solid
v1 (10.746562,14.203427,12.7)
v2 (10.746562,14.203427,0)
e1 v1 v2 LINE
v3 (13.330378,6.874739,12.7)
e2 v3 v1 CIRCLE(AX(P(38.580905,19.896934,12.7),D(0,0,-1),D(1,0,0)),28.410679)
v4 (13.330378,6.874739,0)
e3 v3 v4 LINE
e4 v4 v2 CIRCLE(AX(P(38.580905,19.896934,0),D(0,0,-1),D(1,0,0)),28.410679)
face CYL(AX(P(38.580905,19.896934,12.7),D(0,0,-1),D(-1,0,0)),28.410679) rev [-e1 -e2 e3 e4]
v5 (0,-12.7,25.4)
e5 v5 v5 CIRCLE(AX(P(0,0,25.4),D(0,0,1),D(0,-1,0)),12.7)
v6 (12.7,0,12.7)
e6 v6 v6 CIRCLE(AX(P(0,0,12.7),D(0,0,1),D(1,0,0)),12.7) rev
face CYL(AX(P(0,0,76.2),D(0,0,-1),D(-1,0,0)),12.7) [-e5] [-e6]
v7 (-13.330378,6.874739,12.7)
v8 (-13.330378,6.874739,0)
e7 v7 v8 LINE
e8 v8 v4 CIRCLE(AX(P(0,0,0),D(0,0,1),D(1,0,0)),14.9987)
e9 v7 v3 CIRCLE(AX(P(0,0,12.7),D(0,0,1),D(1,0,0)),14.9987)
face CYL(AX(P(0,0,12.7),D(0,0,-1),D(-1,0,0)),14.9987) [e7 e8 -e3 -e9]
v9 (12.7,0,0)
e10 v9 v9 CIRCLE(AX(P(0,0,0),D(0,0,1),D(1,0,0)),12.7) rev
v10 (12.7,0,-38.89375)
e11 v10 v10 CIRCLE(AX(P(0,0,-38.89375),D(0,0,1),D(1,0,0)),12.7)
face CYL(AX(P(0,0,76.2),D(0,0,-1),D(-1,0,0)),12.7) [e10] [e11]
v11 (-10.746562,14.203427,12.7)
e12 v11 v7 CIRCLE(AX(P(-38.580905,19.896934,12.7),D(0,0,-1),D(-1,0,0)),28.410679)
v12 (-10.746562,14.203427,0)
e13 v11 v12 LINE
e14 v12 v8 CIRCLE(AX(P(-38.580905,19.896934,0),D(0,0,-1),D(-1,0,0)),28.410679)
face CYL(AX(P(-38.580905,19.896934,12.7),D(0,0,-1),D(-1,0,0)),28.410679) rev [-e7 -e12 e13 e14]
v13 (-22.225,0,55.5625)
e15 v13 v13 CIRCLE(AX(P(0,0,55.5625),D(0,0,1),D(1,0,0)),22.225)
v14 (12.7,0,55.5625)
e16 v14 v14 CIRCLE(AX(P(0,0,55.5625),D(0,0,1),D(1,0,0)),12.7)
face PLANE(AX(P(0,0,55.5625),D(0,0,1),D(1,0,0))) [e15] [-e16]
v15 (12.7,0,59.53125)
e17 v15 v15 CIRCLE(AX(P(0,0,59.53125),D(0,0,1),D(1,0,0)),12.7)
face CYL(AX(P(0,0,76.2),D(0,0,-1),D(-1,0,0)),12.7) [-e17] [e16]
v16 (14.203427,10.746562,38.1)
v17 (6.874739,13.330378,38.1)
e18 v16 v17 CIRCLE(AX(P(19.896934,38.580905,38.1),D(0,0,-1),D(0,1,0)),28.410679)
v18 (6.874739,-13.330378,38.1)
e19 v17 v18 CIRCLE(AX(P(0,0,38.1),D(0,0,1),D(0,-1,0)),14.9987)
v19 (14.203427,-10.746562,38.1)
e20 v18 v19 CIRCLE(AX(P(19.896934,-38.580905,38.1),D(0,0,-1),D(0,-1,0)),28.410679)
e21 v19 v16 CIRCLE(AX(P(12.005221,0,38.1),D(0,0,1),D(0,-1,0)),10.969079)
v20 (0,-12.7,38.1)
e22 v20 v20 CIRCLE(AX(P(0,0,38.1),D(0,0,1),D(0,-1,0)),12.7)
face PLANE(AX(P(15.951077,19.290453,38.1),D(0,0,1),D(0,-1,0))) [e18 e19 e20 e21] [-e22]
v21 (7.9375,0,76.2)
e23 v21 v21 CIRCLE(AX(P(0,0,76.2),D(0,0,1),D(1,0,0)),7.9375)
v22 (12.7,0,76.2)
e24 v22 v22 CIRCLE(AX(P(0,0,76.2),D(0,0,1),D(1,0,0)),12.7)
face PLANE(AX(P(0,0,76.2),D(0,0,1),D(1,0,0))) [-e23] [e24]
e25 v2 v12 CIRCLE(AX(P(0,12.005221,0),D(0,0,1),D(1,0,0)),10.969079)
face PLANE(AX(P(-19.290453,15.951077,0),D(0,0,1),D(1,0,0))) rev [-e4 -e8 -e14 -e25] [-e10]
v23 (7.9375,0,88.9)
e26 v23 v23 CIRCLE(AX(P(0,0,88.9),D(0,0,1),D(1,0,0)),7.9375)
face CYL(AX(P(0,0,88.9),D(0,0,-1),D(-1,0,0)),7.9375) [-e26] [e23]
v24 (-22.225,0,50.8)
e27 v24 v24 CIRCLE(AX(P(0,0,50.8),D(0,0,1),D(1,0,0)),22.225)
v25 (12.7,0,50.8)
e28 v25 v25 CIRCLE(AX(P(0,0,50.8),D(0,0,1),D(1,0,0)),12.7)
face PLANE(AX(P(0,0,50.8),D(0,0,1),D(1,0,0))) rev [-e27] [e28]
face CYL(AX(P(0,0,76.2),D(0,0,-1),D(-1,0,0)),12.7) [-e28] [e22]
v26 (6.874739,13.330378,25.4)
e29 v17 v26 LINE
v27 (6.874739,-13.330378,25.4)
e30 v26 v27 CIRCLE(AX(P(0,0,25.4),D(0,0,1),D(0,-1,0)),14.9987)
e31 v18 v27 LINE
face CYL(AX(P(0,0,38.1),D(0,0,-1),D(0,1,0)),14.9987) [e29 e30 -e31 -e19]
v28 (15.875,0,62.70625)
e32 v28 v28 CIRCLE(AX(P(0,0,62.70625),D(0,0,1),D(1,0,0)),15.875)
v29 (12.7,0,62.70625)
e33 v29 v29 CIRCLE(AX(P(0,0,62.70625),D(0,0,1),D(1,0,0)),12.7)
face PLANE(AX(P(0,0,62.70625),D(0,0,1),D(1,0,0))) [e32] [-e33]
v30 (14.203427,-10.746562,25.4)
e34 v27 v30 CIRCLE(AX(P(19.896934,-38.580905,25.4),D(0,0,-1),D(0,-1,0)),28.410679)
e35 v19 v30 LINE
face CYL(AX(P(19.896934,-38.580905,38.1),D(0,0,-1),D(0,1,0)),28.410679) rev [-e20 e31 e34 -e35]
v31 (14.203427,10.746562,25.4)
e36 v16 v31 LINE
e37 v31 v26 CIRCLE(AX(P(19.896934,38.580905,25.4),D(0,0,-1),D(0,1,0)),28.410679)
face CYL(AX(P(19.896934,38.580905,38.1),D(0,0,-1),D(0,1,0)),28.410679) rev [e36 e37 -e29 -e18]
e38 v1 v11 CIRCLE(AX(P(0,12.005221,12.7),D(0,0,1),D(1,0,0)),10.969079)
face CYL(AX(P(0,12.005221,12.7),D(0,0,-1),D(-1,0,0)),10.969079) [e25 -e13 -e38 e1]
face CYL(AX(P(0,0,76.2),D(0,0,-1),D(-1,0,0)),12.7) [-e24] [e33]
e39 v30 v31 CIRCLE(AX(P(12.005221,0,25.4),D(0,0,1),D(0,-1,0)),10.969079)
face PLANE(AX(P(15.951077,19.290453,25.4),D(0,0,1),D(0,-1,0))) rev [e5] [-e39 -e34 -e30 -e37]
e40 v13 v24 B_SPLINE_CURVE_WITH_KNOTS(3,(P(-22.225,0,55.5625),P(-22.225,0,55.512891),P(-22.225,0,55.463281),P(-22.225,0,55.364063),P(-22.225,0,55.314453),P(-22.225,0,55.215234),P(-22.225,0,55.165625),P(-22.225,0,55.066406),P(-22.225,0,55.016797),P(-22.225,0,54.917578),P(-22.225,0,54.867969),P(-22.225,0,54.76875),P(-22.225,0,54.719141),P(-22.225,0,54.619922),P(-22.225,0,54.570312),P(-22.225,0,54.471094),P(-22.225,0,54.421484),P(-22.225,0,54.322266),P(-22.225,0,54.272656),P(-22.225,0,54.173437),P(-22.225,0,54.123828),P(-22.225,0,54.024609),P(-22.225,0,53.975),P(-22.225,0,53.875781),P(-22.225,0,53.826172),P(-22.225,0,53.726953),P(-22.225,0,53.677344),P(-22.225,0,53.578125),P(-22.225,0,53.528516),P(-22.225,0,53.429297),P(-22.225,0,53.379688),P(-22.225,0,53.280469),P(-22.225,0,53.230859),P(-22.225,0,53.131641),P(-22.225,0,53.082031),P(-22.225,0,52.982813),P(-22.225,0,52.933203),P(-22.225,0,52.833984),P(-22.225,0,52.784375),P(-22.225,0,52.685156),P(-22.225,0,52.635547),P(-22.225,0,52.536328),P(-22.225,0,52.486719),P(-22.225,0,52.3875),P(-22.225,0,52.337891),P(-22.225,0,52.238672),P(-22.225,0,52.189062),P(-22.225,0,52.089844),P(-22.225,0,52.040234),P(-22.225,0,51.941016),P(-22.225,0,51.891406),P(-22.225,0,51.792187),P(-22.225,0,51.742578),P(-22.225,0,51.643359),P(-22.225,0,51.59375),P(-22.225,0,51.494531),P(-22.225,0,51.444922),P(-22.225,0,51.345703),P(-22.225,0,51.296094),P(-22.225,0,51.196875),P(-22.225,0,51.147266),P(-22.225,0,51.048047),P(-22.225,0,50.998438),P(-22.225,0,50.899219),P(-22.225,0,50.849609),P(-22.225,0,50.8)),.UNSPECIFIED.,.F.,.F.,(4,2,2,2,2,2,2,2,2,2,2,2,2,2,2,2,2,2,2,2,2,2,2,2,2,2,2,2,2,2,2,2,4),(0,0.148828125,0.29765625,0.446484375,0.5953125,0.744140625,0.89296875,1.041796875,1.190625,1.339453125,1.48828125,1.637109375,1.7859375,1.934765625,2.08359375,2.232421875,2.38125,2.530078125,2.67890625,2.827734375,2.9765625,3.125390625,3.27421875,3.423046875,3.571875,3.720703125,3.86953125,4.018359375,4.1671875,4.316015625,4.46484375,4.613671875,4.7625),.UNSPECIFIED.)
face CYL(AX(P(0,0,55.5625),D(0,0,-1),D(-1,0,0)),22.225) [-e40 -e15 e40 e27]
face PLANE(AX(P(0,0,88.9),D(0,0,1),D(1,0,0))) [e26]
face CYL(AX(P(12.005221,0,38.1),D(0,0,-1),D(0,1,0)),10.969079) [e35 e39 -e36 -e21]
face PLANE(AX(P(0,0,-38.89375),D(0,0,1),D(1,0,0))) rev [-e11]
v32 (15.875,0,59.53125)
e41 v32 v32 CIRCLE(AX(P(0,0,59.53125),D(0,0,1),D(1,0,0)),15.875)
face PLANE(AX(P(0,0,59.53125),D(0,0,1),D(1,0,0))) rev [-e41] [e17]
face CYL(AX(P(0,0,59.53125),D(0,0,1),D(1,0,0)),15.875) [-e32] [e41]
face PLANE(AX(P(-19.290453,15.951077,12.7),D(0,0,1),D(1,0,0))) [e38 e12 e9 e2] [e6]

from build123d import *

# Parameters (mm, degrees)
BOSS_EXTRUDE2_DEPTH      = 12.7
BOSS_EXTRUDE3_DEPTH      = 63.5
BOSS_EXTRUDE3_DEPTH_BACK = 51.59375
SKETCH3_R                = 12.7
CRVPATTERN3_START        = 25.4
CRVPATTERN3_OUTLINE_R    = 12.7
CRVPATTERN3_DEPTH        = 12.7
BOSS_EXTRUDE5_START      = -25.4
SKETCH7_R                = 22.225
BOSS_EXTRUDE5_DEPTH      = 4.7625
BOSS_EXTRUDE7_START      = -13.49375
SKETCH10_R               = 15.875
BOSS_EXTRUDE7_DEPTH      = 3.175
SKETCH9_R                = 7.9375
BOSS_EXTRUDE8_DEPTH      = 12.7


# Read off the part's stored shape, not the designer's step: CrvPattern3
with BuildPart() as part:
    # Sketch2 → Boss-Extrude2 (new body)
    with BuildSketch(Plane.XY):
        with BuildLine():
            ThreePointArc((-10.74656161, 14.203426928), (-11.786721082, 10.450325862), (-13.330377698, 6.874738694))
            ThreePointArc((-13.330377698, 6.874738694), (0, -14.9987), (13.330377698, 6.874738694))
            ThreePointArc((13.330377698, 6.874738694), (11.786721082, 10.450325862), (10.74656161, 14.203426928))
            ThreePointArc((10.74656161, 14.203426928), (0, 22.9743), (-10.74656161, 14.203426928))
        make_face()
    extrude(amount=BOSS_EXTRUDE2_DEPTH)

    # Sketch3 → Boss-Extrude3 (add, two sides: drawn at the far end of the back side and taken through both)
    with BuildSketch(Plane.XY.offset(12.7).offset(-BOSS_EXTRUDE3_DEPTH_BACK)):
        Circle(SKETCH3_R)
    extrude(amount=BOSS_EXTRUDE3_DEPTH + BOSS_EXTRUDE3_DEPTH_BACK)

    # CrvPattern3 outline → CrvPattern3 (add)
    with BuildSketch(Plane.XY.offset(CRVPATTERN3_START)):
        with BuildLine():
            ThreePointArc((6.874738694, 13.330377698), (-14.9987, 0), (6.874738694, -13.330377698))
            ThreePointArc((6.874738694, -13.330377698), (10.450325862, -11.786721082), (14.203426928, -10.74656161))
            ThreePointArc((14.203426928, -10.74656161), (22.9743, 0), (14.203426928, 10.74656161))
            ThreePointArc((14.203426928, 10.74656161), (10.450325862, 11.786721082), (6.874738694, 13.330377698))
        make_face()
        Circle(CRVPATTERN3_OUTLINE_R, mode=Mode.SUBTRACT)
    extrude(amount=CRVPATTERN3_DEPTH)

    # Sketch7 → Boss-Extrude5 (add)
    with BuildSketch(Plane.XY.offset(76.2).offset(BOSS_EXTRUDE5_START)):
        with Locations(Location((0, 0, 0), (0, 0, 180))):
            Circle(SKETCH7_R)
    extrude(amount=BOSS_EXTRUDE5_DEPTH)

    # Sketch10 → Boss-Extrude7 (add)
    with BuildSketch(Plane.XY.offset(76.2).offset(BOSS_EXTRUDE7_START)):
        Circle(SKETCH10_R)
    extrude(amount=-BOSS_EXTRUDE7_DEPTH)

    # Sketch9 → Boss-Extrude8 (add)
    with BuildSketch(Plane.XY.offset(76.2)):
        Circle(SKETCH9_R)
    extrude(amount=BOSS_EXTRUDE8_DEPTH)


solid = part.part
